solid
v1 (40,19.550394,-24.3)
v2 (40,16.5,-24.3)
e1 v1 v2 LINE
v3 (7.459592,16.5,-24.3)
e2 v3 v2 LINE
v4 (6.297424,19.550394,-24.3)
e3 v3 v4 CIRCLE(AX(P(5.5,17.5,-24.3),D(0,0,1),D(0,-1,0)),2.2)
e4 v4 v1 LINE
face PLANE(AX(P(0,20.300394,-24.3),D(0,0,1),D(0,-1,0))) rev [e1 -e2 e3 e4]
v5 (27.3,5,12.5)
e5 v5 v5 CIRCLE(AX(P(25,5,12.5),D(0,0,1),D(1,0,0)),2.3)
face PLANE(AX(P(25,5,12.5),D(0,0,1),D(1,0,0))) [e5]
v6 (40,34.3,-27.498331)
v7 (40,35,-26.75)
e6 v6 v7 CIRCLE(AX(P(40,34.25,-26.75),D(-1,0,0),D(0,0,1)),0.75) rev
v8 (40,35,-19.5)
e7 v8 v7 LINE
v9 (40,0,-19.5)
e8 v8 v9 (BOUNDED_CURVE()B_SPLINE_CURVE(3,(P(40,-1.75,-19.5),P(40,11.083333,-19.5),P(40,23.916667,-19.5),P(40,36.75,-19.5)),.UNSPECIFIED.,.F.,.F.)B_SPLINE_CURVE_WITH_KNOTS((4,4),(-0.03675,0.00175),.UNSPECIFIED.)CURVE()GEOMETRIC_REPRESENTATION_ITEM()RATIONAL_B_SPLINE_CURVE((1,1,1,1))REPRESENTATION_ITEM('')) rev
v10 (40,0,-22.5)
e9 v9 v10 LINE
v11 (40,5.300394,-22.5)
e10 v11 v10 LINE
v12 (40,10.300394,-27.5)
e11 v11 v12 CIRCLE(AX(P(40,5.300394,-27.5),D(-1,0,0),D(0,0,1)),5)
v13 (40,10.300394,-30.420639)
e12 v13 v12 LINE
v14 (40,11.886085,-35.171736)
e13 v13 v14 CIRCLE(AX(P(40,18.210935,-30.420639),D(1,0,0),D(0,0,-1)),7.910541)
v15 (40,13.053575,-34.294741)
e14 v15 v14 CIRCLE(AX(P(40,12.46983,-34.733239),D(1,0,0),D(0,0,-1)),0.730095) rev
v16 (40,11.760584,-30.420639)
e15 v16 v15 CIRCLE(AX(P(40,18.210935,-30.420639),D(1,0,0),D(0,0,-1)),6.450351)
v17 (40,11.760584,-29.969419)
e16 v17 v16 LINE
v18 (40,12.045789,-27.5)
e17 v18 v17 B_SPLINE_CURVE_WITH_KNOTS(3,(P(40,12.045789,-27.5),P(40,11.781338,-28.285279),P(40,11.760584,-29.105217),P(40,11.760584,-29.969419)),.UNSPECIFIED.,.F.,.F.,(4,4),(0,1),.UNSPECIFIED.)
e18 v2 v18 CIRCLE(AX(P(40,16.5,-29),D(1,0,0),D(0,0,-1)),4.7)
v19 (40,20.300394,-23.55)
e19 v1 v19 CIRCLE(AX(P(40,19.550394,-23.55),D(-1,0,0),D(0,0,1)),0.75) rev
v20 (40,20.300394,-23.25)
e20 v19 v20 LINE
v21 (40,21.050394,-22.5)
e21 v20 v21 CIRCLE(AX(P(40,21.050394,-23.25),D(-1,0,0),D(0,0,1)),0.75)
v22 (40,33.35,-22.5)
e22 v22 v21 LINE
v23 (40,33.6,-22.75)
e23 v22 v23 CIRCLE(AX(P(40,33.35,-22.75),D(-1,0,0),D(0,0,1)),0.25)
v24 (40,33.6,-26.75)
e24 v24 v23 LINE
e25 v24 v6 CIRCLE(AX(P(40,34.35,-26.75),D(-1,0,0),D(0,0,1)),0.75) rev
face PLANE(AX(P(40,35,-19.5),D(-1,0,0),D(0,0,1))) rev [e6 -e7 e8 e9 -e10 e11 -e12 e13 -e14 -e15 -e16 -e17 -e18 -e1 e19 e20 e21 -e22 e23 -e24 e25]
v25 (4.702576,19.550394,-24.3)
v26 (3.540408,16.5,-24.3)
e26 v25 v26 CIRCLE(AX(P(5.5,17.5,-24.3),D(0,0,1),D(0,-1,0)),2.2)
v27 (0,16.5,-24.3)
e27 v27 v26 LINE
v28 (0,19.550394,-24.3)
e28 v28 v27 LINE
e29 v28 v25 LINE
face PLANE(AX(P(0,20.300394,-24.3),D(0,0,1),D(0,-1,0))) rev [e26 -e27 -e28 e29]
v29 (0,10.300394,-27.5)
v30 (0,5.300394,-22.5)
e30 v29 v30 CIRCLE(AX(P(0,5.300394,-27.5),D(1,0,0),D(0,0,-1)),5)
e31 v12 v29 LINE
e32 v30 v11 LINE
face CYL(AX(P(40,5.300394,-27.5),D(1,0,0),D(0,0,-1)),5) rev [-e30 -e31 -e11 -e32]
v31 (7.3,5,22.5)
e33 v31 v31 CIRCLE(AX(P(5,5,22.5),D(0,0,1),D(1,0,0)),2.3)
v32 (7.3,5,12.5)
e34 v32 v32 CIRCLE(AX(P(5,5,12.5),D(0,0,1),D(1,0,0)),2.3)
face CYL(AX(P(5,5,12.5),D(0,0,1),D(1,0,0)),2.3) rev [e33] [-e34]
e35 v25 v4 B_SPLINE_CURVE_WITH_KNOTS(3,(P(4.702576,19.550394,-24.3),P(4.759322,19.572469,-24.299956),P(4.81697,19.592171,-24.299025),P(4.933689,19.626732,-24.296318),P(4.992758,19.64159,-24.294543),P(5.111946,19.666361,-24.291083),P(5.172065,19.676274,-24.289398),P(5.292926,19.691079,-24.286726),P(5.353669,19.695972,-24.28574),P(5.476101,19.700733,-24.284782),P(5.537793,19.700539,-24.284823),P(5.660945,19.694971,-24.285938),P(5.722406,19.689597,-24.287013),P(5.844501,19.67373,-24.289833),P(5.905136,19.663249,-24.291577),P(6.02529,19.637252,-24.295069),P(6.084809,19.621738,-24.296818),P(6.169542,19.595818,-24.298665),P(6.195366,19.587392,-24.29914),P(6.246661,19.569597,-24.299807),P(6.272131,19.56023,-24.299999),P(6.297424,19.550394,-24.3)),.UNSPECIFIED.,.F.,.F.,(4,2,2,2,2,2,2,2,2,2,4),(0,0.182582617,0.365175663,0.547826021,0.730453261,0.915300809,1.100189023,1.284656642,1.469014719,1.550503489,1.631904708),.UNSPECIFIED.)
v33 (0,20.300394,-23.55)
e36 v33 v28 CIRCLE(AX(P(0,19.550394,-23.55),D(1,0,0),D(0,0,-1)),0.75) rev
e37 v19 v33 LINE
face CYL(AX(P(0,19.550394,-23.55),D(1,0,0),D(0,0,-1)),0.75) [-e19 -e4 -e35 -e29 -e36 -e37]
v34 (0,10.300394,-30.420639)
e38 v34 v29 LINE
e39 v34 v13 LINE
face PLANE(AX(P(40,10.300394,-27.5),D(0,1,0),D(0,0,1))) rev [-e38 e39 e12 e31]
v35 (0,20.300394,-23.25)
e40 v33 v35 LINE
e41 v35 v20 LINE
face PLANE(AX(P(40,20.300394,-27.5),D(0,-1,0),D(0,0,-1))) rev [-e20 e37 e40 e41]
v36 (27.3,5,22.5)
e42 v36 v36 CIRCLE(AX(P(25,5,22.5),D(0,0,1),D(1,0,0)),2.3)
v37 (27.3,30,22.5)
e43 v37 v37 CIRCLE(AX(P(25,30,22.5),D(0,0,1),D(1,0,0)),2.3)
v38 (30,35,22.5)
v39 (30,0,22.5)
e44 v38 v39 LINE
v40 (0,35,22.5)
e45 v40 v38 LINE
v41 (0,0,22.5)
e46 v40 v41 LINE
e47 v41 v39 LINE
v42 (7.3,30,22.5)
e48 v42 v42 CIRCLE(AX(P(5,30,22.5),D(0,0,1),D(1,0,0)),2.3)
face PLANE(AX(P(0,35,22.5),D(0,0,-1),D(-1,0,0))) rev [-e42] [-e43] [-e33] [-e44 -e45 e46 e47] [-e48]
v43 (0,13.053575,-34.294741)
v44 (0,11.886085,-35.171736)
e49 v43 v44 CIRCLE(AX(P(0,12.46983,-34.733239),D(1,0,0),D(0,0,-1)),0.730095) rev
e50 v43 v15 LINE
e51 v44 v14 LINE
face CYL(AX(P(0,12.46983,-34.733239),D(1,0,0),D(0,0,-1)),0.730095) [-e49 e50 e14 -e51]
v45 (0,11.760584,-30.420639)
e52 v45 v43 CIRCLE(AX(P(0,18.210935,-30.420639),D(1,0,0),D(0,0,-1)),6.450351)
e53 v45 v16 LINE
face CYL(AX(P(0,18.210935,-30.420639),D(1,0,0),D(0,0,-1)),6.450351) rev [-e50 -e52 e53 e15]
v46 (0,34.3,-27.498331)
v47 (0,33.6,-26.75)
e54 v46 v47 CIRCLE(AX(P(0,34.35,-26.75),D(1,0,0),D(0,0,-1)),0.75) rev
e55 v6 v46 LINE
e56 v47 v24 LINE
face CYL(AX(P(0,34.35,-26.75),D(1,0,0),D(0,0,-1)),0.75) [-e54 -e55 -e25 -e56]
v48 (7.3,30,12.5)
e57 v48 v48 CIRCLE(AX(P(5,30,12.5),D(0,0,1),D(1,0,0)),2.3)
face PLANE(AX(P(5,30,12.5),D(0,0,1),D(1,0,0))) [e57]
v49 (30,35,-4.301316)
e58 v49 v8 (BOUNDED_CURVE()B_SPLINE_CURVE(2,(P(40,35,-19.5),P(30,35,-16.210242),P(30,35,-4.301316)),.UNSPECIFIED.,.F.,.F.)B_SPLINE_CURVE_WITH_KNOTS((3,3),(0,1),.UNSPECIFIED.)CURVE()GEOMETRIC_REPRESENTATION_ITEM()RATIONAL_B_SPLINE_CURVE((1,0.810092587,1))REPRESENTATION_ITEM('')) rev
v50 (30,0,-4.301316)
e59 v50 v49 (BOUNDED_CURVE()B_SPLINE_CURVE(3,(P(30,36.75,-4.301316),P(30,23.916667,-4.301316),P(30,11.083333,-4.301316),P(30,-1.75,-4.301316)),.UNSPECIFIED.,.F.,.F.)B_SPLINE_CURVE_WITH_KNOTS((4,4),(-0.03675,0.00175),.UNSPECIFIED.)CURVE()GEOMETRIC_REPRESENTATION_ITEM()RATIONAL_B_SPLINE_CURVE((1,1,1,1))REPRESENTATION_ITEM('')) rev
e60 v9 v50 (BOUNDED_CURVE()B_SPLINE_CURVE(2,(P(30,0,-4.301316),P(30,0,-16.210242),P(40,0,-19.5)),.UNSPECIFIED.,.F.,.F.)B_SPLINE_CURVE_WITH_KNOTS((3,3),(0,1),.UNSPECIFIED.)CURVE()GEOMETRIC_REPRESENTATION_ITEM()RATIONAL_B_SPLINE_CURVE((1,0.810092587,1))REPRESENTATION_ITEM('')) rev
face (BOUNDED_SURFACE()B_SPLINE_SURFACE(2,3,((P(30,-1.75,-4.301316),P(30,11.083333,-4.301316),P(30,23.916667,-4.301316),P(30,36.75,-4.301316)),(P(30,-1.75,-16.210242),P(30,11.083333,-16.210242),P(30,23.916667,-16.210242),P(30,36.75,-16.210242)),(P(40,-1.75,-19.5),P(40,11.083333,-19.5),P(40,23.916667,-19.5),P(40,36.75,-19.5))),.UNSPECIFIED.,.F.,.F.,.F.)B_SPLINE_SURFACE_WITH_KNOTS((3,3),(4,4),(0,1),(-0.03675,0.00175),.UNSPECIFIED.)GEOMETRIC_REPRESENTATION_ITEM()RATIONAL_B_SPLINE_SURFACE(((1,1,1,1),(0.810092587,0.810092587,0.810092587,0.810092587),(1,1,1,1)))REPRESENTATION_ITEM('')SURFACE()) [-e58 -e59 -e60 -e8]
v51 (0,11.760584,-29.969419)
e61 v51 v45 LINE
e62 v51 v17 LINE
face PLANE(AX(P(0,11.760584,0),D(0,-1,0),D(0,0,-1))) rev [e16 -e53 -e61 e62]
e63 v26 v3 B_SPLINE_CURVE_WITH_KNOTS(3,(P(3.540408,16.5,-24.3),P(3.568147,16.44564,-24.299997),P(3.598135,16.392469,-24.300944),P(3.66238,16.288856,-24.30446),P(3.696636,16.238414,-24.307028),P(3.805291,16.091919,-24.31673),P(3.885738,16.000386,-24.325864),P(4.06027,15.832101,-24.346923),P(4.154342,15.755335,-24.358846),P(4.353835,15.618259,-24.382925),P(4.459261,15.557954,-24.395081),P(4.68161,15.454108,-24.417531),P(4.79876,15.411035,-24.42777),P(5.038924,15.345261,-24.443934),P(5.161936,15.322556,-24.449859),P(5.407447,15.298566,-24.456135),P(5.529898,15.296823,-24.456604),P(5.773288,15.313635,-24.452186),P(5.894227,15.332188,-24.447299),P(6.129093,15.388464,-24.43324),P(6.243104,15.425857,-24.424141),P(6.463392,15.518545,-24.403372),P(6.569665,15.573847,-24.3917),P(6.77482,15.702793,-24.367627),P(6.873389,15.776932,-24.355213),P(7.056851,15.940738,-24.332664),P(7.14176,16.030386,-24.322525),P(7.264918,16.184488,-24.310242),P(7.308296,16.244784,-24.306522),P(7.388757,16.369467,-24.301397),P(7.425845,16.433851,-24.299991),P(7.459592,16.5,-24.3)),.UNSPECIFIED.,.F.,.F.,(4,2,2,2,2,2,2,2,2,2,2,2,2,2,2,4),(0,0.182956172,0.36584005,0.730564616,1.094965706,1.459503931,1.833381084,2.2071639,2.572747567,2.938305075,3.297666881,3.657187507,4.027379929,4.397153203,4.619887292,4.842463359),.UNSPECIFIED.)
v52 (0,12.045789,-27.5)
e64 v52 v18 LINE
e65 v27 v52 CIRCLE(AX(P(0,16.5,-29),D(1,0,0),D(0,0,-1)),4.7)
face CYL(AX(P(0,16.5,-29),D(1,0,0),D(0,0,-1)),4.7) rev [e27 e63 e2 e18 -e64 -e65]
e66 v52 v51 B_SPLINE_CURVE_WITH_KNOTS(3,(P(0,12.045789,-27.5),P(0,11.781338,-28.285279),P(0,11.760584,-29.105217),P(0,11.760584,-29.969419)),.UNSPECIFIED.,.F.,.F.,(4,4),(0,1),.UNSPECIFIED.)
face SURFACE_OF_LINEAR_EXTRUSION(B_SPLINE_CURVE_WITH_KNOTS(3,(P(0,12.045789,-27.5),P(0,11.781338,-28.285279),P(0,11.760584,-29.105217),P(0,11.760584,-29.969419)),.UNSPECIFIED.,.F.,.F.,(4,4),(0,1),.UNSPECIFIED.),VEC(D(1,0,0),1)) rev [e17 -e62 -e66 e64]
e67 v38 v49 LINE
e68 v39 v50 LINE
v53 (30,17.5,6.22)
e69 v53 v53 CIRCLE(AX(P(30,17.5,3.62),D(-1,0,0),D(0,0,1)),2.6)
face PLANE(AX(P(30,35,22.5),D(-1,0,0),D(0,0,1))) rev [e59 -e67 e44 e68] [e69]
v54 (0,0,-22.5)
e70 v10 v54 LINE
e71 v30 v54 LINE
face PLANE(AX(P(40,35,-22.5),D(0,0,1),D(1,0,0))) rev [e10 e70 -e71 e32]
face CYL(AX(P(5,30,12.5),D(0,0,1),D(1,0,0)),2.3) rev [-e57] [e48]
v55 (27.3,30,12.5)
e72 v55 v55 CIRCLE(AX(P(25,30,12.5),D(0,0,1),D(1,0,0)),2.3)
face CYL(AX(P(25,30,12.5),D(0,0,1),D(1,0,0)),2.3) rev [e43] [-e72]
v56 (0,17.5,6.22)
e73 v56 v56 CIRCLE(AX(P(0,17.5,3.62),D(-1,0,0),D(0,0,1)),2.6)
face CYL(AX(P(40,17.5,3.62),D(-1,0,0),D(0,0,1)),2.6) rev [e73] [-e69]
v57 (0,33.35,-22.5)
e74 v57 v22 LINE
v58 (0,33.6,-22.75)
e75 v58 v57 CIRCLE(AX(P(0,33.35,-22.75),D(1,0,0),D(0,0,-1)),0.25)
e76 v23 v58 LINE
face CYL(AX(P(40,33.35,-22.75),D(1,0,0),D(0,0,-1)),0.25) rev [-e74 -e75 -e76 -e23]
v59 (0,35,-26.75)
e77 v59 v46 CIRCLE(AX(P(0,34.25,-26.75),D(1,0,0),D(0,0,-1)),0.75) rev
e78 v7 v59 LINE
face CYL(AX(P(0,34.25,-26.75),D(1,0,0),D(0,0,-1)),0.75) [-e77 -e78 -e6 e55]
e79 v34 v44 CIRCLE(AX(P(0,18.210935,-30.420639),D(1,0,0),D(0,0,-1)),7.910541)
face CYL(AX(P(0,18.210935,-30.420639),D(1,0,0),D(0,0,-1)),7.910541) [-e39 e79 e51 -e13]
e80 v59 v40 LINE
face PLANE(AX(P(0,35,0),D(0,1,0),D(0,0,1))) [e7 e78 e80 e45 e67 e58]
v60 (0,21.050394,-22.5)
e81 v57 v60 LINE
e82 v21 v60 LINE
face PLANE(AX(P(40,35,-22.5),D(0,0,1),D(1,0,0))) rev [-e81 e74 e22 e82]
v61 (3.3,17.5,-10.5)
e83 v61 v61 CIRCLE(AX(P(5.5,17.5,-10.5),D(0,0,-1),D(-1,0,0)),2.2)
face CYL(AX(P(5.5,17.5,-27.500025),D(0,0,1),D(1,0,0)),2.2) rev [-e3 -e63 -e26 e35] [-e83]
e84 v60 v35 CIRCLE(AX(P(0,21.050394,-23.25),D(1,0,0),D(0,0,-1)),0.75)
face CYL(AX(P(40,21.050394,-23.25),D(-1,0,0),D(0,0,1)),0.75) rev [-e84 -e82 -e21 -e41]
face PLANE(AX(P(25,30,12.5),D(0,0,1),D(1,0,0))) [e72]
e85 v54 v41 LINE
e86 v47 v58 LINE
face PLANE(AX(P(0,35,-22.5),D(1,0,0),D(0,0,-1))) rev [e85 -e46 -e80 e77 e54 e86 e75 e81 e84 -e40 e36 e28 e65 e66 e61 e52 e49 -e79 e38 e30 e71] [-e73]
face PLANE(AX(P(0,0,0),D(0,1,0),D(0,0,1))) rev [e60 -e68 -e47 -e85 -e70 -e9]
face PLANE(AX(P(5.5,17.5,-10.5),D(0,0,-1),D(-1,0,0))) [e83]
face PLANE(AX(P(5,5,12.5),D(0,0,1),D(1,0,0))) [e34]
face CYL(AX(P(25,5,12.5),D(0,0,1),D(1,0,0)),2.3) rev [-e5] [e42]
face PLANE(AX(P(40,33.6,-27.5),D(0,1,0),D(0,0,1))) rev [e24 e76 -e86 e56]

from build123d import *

# Parameters (mm, degrees)
BOSS_EXTRUDE1_DEPTH     = 35
SKETCH3_R               = 2.6
CUT_EXTRUDE1_DEPTH      = 58.716981903
FILLET1_DEPTH           = 35
SKETCH5_R               = 2.3
CUT_EXTRUDE3_DEPTH      = 10
SKETCH7_W               = 40
SKETCH7_H               = 1.4
SKETCH7_H_2             = 10
BOSS_EXTRUDE2_DEPTH     = 5
CUT_EXTRUDE2_DEPTH      = 70.641941558
CUT_EXTRUDE2_DEPTH_BACK = 12
SKETCH4_R               = 2.2
CUT_EXTRUDE4_DEPTH      = 60.843546189
FILLET2_R               = 0.75
BOSS_EXTRUDE3_DEPTH     = 40
FILLET3_R               = 0.75
FILLET4_R               = 0.25
FILLET5_R               = 5


with BuildPart() as part:
    # Sketch1 → Boss-Extrude1 (new body)
    with BuildSketch(Plane(origin=(0, 0, 0), x_dir=(1, 0, 0), z_dir=(0, 1, 0))):
        Polygon((0, 22.5), (0, -22.5), (30, -22.5), (30, 19.5), (40, 19.5), (40, 22.5), align=None)
    extrude(amount=BOSS_EXTRUDE1_DEPTH)

    # Sketch3 → Cut-Extrude1 (cut, through all)
    with BuildSketch(Plane.ZY):
        with Locations((3.62, 17.5)):
            Circle(SKETCH3_R)
    extrude(amount=-CUT_EXTRUDE1_DEPTH, mode=Mode.SUBTRACT)

    # Fillet1: read off the stored shape, not the designer's step
    # Fillet1 outline → Fillet1 (add)
    with BuildSketch(Plane(origin=(0, 0, 0), x_dir=(1, 0, 0), z_dir=(0, 1, 0))):
        with BuildLine():
            Line((30, 19.5), (30, 4.301315846))
            add(Edge.make_bspline(
                [(30, 4.301315846), (30, 16.210241525), (40, 19.5)],
                knots=[0, 0, 0, 1, 1, 1], degree=2, weights=[1, 0.810092587, 1]))
            Line((40, 19.5), (30, 19.5))
        make_face()
    extrude(amount=FILLET1_DEPTH)

    # Sketch5 → Cut-Extrude3 (cut)
    with BuildSketch(Plane.XY.offset(22.5)):
        with Locations((5, 30)):
            Circle(SKETCH5_R)
        with Locations((5, 5)):
            Circle(SKETCH5_R)
        with Locations((25, 5)):
            Circle(SKETCH5_R)
        with Locations((25, 30)):
            Circle(SKETCH5_R)
    extrude(amount=-CUT_EXTRUDE3_DEPTH, mode=Mode.SUBTRACT)

    # Sketch7 → Boss-Extrude2 (add)
    with BuildSketch(Plane(origin=(0, 0, -22.5), x_dir=(-1, 0, 0), z_dir=(0, 0, -1))):
        with Locations((-20, 34.3)):
            Rectangle(SKETCH7_W, SKETCH7_H)
        with Locations((-20, 15.30039382)):
            Rectangle(SKETCH7_W, SKETCH7_H_2)
    extrude(amount=BOSS_EXTRUDE2_DEPTH)

    # Sketch4 → Cut-Extrude2 (cut, two sides: drawn at the far end of the back side and taken through both)
    with BuildSketch(Plane(origin=(0, 0, -22.5), x_dir=(-1, 0, 0), z_dir=(0, 0, -1)).offset(-CUT_EXTRUDE2_DEPTH_BACK)):
        with Locations((-5.5, 17.5)):
            Circle(SKETCH4_R)
    extrude(amount=CUT_EXTRUDE2_DEPTH + CUT_EXTRUDE2_DEPTH_BACK, mode=Mode.SUBTRACT)

    # Sketch9 → Cut-Extrude4 (cut, through all)
    with BuildSketch(Plane(origin=(40, 0, 0), x_dir=(0, 0, -1), z_dir=(1, 0, 0))):
        with BuildLine():
            Line((27.5, 20.30039382), (24.3, 20.30039382))
            Line((24.3, 20.30039382), (24.3, 16.5))
            ThreePointArc((24.3, 16.5), (25.182933063, 13.75773816), (27.5, 12.04578851))
            Line((27.5, 12.04578851), (27.5, 20.30039382))
        make_face()
    extrude(amount=-CUT_EXTRUDE4_DEPTH, mode=Mode.SUBTRACT)

    # Fillet2
    # the kernel refuses this fillet: 0.75 mm, written as the material it takes off along each edge
    with BuildSketch(Plane(origin=(41.875, 20.30039382, -24.3), x_dir=(0, 0, 1), z_dir=(-1, 0, 0))) as fillet2_piece_1:
        with BuildLine():
            CenterArc((FILLET2_R, -FILLET2_R), FILLET2_R, 90, 90)
            Line((0, -FILLET2_R), (0, 0))
            Line((0, 0), (FILLET2_R, 0))
        make_face()
    extrude(amount=43.75, mode=Mode.SUBTRACT)

    # Sketch10 → Boss-Extrude3 (add, through all)
    with BuildSketch(Plane(origin=(40, 0, 0), x_dir=(0, 0, -1), z_dir=(1, 0, 0))):
        with BuildLine():
            Line((30.420638784, 11.76058351), (29.969418861, 11.76058351))
            add(Edge.make_bspline(
                [(27.5, 12.04578851), (28.285278796, 11.781338069), (29.10521732, 11.76058351), (29.969418861, 11.76058351)],
                knots=[0, 0, 0, 0, 1, 1, 1, 1], degree=3))
            Line((27.5, 12.04578851), (27.5, 10.30039382))
            Line((27.5, 10.30039382), (30.420638784, 10.30039382))
            ThreePointArc((30.420638784, 10.30039382), (32.925002128, 10.70728085), (35.171736316, 11.886084613))
            ThreePointArc((35.171736316, 11.886084613), (35.316984097, 12.908327269), (34.294741441, 13.05357505))
            ThreePointArc((34.294741441, 13.05357505), (32.462727085, 12.092364139), (30.420638784, 11.76058351))
        make_face()
    extrude(amount=-BOSS_EXTRUDE3_DEPTH)

    # Fillet3
    # the kernel refuses this fillet: 0.75 mm, written as the material it adds along each edge
    with BuildSketch(Plane(origin=(40, 20.30039382, -22.5), x_dir=(0, 1, 0), z_dir=(-1, 0, 0))) as fillet3_piece_1:
        with BuildLine():
            CenterArc((FILLET3_R, FILLET3_R), FILLET3_R, 180, 90)
            Line((0, FILLET3_R), (0, 0))
            Line((0, 0), (FILLET3_R, 0))
        make_face()
    extrude(amount=40)
    # the kernel refuses this fillet: 0.75 mm, written as the material it takes off along each edge
    with BuildSketch(Plane(origin=(41.875, 35, -27.5), x_dir=(0, -1, 0), z_dir=(-1, 0, 0))) as fillet3_2_piece_1:
        with BuildLine():
            CenterArc((FILLET3_R, FILLET3_R), FILLET3_R, 180, 90)
            Line((0, FILLET3_R), (0, 0))
            Line((0, 0), (FILLET3_R, 0))
        make_face()
    extrude(amount=43.75, mode=Mode.SUBTRACT)
    with BuildSketch(Plane(origin=(-1.875, 33.6, -27.5), x_dir=(0, 0, 1), z_dir=(1, 0, 0))) as fillet3_2_piece_2:
        with BuildLine():
            CenterArc((FILLET3_R, -FILLET3_R), FILLET3_R, 90, 90)
            Line((0, -FILLET3_R), (0, 0))
            Line((0, 0), (FILLET3_R, 0))
        make_face()
    extrude(amount=43.75, mode=Mode.SUBTRACT)

    # Fillet4
    fillet4_edges = [part.edges().sort_by_distance(p)[0] for p in [
        (20, 33.6, -22.5),
    ]]
    fillet(fillet4_edges, radius=FILLET4_R)

    # Fillet5
    fillet5_edges = [part.edges().sort_by_distance(p)[0] for p in [
        (20, 10.30039382, -22.5),
    ]]
    fillet(fillet5_edges, radius=FILLET5_R)


solid = part.part
